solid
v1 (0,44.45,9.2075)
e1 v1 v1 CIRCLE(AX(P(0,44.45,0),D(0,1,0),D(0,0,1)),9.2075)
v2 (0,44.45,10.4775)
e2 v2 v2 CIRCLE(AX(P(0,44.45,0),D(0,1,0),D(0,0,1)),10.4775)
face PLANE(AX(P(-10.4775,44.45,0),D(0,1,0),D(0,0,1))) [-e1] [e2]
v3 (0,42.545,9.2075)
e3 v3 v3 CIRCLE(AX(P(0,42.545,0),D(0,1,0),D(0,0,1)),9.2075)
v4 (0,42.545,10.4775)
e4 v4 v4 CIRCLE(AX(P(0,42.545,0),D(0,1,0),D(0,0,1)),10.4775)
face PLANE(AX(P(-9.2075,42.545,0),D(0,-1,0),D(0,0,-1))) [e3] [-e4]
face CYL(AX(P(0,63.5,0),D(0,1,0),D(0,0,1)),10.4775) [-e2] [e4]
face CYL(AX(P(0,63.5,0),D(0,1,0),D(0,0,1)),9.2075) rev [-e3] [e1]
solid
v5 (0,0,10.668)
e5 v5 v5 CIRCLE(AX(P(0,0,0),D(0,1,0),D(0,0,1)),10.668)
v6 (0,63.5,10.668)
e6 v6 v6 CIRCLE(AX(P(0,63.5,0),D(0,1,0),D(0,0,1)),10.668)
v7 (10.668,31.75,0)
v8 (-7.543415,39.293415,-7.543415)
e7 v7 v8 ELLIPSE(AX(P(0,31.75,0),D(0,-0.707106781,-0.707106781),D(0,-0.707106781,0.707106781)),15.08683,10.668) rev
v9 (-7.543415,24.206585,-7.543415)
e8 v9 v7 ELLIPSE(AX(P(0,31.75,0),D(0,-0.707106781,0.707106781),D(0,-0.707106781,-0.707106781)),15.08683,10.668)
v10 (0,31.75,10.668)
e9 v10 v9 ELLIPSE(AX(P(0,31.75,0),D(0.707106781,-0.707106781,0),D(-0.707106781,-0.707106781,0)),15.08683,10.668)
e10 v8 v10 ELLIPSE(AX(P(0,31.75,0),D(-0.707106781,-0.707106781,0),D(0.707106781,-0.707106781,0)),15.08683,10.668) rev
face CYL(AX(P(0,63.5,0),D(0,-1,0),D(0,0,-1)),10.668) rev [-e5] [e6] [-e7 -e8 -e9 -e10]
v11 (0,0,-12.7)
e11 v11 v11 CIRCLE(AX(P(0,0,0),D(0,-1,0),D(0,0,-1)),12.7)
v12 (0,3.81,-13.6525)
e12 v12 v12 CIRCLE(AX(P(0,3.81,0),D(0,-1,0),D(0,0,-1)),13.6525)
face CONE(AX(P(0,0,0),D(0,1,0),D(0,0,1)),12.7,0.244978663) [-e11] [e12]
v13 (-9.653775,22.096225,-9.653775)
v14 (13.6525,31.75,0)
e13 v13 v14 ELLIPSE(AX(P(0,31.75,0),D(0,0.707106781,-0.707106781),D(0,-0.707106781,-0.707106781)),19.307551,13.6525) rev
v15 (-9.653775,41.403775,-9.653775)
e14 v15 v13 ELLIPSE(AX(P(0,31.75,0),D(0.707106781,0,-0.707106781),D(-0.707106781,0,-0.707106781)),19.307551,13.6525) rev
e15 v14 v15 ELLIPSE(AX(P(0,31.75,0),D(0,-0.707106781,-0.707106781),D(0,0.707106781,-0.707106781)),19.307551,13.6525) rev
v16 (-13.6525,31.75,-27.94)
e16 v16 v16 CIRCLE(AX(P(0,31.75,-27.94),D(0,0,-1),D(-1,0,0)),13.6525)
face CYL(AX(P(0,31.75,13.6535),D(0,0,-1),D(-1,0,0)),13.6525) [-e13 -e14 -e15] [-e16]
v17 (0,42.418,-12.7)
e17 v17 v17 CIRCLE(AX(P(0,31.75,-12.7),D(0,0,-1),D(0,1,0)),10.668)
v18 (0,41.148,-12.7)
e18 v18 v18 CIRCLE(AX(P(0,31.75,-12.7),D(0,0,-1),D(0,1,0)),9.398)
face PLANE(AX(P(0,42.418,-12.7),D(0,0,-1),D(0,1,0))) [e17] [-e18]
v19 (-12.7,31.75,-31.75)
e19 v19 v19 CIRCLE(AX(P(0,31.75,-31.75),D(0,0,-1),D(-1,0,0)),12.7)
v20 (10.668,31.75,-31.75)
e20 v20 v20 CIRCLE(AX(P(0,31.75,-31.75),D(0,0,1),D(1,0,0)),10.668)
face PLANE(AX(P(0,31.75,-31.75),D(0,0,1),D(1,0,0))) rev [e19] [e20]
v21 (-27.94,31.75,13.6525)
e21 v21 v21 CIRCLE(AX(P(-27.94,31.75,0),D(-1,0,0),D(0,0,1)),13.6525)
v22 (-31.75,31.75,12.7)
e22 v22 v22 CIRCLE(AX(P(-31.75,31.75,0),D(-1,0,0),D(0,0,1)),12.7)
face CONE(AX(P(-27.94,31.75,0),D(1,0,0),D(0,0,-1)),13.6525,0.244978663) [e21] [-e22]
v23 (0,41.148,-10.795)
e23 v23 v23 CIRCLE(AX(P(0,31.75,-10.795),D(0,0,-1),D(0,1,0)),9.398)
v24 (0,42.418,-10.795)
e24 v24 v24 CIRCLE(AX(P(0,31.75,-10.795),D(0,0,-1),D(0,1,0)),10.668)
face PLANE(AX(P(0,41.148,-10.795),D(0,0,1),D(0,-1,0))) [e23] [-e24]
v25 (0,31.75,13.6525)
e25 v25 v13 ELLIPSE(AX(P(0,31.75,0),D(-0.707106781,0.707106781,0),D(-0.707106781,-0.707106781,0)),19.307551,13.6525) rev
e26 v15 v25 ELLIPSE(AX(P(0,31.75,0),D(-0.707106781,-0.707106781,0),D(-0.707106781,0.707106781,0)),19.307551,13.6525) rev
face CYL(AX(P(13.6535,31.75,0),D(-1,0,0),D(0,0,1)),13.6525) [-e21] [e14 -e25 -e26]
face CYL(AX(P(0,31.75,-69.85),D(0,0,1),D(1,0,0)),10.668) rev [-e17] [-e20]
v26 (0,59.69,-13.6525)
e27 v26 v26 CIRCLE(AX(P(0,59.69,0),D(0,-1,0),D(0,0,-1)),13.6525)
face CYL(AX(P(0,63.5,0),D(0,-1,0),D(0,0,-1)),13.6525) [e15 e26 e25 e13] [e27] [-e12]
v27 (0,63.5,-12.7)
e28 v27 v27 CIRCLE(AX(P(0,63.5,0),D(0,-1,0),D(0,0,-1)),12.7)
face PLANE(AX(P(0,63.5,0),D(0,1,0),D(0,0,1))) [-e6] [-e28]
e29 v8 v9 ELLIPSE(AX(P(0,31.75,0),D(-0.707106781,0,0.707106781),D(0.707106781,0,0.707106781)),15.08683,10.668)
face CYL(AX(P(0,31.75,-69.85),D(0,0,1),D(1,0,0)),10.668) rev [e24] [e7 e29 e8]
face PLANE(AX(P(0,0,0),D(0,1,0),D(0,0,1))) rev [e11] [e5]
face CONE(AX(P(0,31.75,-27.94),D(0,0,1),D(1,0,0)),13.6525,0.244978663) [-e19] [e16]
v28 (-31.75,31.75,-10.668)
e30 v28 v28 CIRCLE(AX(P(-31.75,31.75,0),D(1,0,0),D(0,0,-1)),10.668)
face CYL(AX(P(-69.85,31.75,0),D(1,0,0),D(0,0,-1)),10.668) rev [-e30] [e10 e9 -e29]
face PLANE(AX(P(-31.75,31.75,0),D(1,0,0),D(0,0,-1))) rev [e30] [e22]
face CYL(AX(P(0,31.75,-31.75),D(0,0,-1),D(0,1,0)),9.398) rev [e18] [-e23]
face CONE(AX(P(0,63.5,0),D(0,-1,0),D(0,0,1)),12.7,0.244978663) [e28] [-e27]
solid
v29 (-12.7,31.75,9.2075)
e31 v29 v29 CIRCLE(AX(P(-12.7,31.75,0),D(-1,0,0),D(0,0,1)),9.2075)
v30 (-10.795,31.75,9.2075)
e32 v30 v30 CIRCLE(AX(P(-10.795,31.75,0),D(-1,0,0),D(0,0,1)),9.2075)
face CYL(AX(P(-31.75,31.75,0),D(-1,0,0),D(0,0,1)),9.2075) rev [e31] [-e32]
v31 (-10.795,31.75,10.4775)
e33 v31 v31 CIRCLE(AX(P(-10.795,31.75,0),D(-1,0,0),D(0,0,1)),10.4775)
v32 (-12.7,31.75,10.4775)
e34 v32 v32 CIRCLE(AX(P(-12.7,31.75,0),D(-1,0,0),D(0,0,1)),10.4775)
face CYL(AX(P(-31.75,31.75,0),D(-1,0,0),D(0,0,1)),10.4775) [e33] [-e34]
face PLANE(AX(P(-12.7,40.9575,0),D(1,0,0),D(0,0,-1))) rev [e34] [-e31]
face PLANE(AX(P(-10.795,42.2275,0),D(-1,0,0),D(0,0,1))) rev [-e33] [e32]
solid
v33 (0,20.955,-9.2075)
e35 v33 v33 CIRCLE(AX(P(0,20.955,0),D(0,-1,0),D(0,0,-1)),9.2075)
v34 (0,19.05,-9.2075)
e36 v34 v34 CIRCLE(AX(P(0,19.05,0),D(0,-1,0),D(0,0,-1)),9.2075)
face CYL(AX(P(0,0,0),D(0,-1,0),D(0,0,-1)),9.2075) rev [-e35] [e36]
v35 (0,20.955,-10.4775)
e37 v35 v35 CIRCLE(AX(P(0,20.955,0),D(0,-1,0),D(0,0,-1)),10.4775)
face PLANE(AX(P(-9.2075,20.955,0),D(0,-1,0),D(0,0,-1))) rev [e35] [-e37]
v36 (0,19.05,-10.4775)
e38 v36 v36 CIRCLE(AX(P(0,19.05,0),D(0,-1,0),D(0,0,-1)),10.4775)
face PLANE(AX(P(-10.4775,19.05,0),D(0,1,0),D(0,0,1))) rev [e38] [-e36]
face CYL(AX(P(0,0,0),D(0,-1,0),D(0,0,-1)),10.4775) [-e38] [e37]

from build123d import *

# Parameters (mm, degrees)
SKETCH1_R                = 13.6525
SKETCH1_R_2              = 10.668
BOSS_EXTRUDE1_DEPTH      = 63.5
SKETCH3_R                = 10.668
CUT_EXTRUDE2_DEPTH       = 69.85
BOSS_EXTRUDE2_REACH      = 81.247
BOSS_EXTRUDE2_END_RADIUS = 13.6525
SKETCH4_R                = 13.6525
SKETCH4_R_2              = 10.668
SKETCH5_R                = 10.668
CUT_EXTRUDE3_DEPTH       = 69.85
BOSS_EXTRUDE3_REACH      = 86.272
BOSS_EXTRUDE3_END_RADIUS = 13.6525
SKETCH6_R                = 13.6525
SKETCH6_R_2              = 10.668
SKETCH8_R                = 10.668
CUT_EXTRUDE5_DEPTH       = 69.85
SKETCH10_W               = 1.27
SKETCH10_H               = 1.905
SKETCH11_W               = 1.27
SKETCH11_H               = 1.905
SKETCH12_W               = 1.905
SKETCH12_H               = 1.27
SKETCH13_W               = 1.905
SKETCH13_H               = 1.27


with BuildPart() as part:
    # Sketch1 → Boss-Extrude1 (new body)
    with BuildSketch(Plane(origin=(0, 0, 0), x_dir=(1, 0, 0), z_dir=(0, 1, 0))):
        Circle(SKETCH1_R)
        Circle(SKETCH1_R_2, mode=Mode.SUBTRACT)
    extrude(amount=BOSS_EXTRUDE1_DEPTH)

    # Sketch3 → Cut-Extrude2 (cut)
    with BuildSketch(Plane.XY):
        with Locations((0, 31.75)):
            Circle(SKETCH3_R)
    extrude(amount=-CUT_EXTRUDE2_DEPTH, mode=Mode.SUBTRACT)

    # Boss-Extrude2: up to this cylinder (the profile starts outside it)
    boss_extrude2_end = Plane(origin=(0, 31.75, 0), z_dir=(0, -1, 0)) * Cylinder(BOSS_EXTRUDE2_END_RADIUS, 190.799, mode=Mode.PRIVATE)
    # Sketch4 → Boss-Extrude2 (add, up to the surface)
    with BuildSketch(Plane.XY.offset(-31.75), mode=Mode.PRIVATE) as boss_extrude2_sk1:
        with Locations((0, 31.75)):
            Circle(SKETCH4_R)
        with Locations((0, 31.75)):
            Circle(SKETCH4_R_2, mode=Mode.SUBTRACT)
    boss_extrude2_tool1 = extrude(boss_extrude2_sk1.sketch, amount=BOSS_EXTRUDE2_REACH, mode=Mode.PRIVATE) - boss_extrude2_end
    add(boss_extrude2_tool1.solids().sort_by_distance((-13.266349, 31.75, -31.75))[0])

    # Sketch5 → Cut-Extrude3 (cut)
    with BuildSketch(Plane(origin=(0, 0, 0), x_dir=(0, 0, -1), z_dir=(1, 0, 0))):
        with Locations((0, 31.75)):
            Circle(SKETCH5_R)
    extrude(amount=-CUT_EXTRUDE3_DEPTH, mode=Mode.SUBTRACT)

    # Boss-Extrude3: up to this cylinder (the profile starts outside it)
    boss_extrude3_end = Plane(origin=(0, 31.75, 0), z_dir=(0, -1, 0)) * Cylinder(BOSS_EXTRUDE3_END_RADIUS, 200.849, mode=Mode.PRIVATE)
    # Sketch6 → Boss-Extrude3 (add, up to the surface)
    with BuildSketch(Plane(origin=(-31.75, 0, 0), x_dir=(0, 0, -1), z_dir=(1, 0, 0)), mode=Mode.PRIVATE) as boss_extrude3_sk1:
        with Locations((0, 31.75)):
            Circle(SKETCH6_R)
        with Locations((0, 31.75)):
            Circle(SKETCH6_R_2, mode=Mode.SUBTRACT)
    boss_extrude3_tool1 = extrude(boss_extrude3_sk1.sketch, amount=BOSS_EXTRUDE3_REACH, mode=Mode.PRIVATE) - boss_extrude3_end
    add(boss_extrude3_tool1.solids().sort_by_distance((-31.75, 31.75, 13.266349))[0])

    # Sketch8 → Cut-Extrude5 (cut)
    with BuildSketch(Plane.XY):
        with Locations((0, 31.75)):
            Circle(SKETCH8_R)
    extrude(amount=-CUT_EXTRUDE5_DEPTH, mode=Mode.SUBTRACT)

    # Sketch13 → Revolve7 (revolve)
    with BuildSketch(Plane(origin=(0, 0, 0), x_dir=(0, 0, -1), z_dir=(1, 0, 0))):
        with Locations((11.7475, 41.783)):
            Rectangle(SKETCH13_W, SKETCH13_H)
    revolve(axis=Axis((0, 31.75, -31.75), (0, 0, 1)))

    # Sketch14 → Cut-Revolve1 (revolve, cut)
    with BuildSketch(Plane(origin=(0, 0, 0), x_dir=(0, 0, -1), z_dir=(1, 0, 0))):
        Polygon((13.6525, 0), (13.6525, 3.81), (12.7, 0), align=None)
    cut_revolve1 = revolve(axis=Axis((0, 0, 0), (0, 1, 0)), mode=Mode.SUBTRACT)

    # Mirror1: Cut-Revolve1 across plane
    add(cut_revolve1.mirror(Plane.ZX.offset(31.75)), mode=Mode.SUBTRACT)

    # Sketch15 → Cut-Revolve2 (revolve, cut)
    with BuildSketch(Plane(origin=(0, 31.75, 0), x_dir=(1, 0, 0), z_dir=(0, 1, 0))):
        Polygon((-13.6525, 31.75), (-13.6525, 27.94), (-12.7, 31.75), align=None)
    revolve(axis=Axis((0, 31.75, -31.75), (0, 0, 1)), mode=Mode.SUBTRACT)

    # Sketch16 → Cut-Revolve3 (revolve, cut)
    with BuildSketch(Plane(origin=(0, 31.75, 0), x_dir=(1, 0, 0), z_dir=(0, 1, 0))):
        Polygon((-31.75, -13.6525), (-27.94, -13.6525), (-31.75, -12.7), align=None)
    revolve(axis=Axis((-31.75, 31.75, 0), (1, 0, 0)), mode=Mode.SUBTRACT)


with BuildPart() as body_2:
    # Sketch10 → Revolve1 (revolve)
    with BuildSketch(Plane.XY):
        with Locations((-9.8425, 43.4975)):
            Rectangle(SKETCH10_W, SKETCH10_H)
    revolve(axis=Axis((0, 63.5, 0), (0, -1, 0)))


with BuildPart() as body_3:
    # Sketch11 → Revolve5 (revolve)
    with BuildSketch(Plane.XY):
        with Locations((-9.8425, 20.0025)):
            Rectangle(SKETCH11_W, SKETCH11_H)
    revolve(axis=Axis((0, 0, 0), (0, 1, 0)))


with BuildPart() as body_4:
    # Sketch12 → Revolve6 (revolve)
    with BuildSketch(Plane.XY):
        with Locations((-11.7475, 41.5925)):
            Rectangle(SKETCH12_W, SKETCH12_H)
    revolve(axis=Axis((-31.75, 31.75, 0), (1, 0, 0)))


solid = Compound([part.part, body_2.part, body_3.part, body_4.part])
